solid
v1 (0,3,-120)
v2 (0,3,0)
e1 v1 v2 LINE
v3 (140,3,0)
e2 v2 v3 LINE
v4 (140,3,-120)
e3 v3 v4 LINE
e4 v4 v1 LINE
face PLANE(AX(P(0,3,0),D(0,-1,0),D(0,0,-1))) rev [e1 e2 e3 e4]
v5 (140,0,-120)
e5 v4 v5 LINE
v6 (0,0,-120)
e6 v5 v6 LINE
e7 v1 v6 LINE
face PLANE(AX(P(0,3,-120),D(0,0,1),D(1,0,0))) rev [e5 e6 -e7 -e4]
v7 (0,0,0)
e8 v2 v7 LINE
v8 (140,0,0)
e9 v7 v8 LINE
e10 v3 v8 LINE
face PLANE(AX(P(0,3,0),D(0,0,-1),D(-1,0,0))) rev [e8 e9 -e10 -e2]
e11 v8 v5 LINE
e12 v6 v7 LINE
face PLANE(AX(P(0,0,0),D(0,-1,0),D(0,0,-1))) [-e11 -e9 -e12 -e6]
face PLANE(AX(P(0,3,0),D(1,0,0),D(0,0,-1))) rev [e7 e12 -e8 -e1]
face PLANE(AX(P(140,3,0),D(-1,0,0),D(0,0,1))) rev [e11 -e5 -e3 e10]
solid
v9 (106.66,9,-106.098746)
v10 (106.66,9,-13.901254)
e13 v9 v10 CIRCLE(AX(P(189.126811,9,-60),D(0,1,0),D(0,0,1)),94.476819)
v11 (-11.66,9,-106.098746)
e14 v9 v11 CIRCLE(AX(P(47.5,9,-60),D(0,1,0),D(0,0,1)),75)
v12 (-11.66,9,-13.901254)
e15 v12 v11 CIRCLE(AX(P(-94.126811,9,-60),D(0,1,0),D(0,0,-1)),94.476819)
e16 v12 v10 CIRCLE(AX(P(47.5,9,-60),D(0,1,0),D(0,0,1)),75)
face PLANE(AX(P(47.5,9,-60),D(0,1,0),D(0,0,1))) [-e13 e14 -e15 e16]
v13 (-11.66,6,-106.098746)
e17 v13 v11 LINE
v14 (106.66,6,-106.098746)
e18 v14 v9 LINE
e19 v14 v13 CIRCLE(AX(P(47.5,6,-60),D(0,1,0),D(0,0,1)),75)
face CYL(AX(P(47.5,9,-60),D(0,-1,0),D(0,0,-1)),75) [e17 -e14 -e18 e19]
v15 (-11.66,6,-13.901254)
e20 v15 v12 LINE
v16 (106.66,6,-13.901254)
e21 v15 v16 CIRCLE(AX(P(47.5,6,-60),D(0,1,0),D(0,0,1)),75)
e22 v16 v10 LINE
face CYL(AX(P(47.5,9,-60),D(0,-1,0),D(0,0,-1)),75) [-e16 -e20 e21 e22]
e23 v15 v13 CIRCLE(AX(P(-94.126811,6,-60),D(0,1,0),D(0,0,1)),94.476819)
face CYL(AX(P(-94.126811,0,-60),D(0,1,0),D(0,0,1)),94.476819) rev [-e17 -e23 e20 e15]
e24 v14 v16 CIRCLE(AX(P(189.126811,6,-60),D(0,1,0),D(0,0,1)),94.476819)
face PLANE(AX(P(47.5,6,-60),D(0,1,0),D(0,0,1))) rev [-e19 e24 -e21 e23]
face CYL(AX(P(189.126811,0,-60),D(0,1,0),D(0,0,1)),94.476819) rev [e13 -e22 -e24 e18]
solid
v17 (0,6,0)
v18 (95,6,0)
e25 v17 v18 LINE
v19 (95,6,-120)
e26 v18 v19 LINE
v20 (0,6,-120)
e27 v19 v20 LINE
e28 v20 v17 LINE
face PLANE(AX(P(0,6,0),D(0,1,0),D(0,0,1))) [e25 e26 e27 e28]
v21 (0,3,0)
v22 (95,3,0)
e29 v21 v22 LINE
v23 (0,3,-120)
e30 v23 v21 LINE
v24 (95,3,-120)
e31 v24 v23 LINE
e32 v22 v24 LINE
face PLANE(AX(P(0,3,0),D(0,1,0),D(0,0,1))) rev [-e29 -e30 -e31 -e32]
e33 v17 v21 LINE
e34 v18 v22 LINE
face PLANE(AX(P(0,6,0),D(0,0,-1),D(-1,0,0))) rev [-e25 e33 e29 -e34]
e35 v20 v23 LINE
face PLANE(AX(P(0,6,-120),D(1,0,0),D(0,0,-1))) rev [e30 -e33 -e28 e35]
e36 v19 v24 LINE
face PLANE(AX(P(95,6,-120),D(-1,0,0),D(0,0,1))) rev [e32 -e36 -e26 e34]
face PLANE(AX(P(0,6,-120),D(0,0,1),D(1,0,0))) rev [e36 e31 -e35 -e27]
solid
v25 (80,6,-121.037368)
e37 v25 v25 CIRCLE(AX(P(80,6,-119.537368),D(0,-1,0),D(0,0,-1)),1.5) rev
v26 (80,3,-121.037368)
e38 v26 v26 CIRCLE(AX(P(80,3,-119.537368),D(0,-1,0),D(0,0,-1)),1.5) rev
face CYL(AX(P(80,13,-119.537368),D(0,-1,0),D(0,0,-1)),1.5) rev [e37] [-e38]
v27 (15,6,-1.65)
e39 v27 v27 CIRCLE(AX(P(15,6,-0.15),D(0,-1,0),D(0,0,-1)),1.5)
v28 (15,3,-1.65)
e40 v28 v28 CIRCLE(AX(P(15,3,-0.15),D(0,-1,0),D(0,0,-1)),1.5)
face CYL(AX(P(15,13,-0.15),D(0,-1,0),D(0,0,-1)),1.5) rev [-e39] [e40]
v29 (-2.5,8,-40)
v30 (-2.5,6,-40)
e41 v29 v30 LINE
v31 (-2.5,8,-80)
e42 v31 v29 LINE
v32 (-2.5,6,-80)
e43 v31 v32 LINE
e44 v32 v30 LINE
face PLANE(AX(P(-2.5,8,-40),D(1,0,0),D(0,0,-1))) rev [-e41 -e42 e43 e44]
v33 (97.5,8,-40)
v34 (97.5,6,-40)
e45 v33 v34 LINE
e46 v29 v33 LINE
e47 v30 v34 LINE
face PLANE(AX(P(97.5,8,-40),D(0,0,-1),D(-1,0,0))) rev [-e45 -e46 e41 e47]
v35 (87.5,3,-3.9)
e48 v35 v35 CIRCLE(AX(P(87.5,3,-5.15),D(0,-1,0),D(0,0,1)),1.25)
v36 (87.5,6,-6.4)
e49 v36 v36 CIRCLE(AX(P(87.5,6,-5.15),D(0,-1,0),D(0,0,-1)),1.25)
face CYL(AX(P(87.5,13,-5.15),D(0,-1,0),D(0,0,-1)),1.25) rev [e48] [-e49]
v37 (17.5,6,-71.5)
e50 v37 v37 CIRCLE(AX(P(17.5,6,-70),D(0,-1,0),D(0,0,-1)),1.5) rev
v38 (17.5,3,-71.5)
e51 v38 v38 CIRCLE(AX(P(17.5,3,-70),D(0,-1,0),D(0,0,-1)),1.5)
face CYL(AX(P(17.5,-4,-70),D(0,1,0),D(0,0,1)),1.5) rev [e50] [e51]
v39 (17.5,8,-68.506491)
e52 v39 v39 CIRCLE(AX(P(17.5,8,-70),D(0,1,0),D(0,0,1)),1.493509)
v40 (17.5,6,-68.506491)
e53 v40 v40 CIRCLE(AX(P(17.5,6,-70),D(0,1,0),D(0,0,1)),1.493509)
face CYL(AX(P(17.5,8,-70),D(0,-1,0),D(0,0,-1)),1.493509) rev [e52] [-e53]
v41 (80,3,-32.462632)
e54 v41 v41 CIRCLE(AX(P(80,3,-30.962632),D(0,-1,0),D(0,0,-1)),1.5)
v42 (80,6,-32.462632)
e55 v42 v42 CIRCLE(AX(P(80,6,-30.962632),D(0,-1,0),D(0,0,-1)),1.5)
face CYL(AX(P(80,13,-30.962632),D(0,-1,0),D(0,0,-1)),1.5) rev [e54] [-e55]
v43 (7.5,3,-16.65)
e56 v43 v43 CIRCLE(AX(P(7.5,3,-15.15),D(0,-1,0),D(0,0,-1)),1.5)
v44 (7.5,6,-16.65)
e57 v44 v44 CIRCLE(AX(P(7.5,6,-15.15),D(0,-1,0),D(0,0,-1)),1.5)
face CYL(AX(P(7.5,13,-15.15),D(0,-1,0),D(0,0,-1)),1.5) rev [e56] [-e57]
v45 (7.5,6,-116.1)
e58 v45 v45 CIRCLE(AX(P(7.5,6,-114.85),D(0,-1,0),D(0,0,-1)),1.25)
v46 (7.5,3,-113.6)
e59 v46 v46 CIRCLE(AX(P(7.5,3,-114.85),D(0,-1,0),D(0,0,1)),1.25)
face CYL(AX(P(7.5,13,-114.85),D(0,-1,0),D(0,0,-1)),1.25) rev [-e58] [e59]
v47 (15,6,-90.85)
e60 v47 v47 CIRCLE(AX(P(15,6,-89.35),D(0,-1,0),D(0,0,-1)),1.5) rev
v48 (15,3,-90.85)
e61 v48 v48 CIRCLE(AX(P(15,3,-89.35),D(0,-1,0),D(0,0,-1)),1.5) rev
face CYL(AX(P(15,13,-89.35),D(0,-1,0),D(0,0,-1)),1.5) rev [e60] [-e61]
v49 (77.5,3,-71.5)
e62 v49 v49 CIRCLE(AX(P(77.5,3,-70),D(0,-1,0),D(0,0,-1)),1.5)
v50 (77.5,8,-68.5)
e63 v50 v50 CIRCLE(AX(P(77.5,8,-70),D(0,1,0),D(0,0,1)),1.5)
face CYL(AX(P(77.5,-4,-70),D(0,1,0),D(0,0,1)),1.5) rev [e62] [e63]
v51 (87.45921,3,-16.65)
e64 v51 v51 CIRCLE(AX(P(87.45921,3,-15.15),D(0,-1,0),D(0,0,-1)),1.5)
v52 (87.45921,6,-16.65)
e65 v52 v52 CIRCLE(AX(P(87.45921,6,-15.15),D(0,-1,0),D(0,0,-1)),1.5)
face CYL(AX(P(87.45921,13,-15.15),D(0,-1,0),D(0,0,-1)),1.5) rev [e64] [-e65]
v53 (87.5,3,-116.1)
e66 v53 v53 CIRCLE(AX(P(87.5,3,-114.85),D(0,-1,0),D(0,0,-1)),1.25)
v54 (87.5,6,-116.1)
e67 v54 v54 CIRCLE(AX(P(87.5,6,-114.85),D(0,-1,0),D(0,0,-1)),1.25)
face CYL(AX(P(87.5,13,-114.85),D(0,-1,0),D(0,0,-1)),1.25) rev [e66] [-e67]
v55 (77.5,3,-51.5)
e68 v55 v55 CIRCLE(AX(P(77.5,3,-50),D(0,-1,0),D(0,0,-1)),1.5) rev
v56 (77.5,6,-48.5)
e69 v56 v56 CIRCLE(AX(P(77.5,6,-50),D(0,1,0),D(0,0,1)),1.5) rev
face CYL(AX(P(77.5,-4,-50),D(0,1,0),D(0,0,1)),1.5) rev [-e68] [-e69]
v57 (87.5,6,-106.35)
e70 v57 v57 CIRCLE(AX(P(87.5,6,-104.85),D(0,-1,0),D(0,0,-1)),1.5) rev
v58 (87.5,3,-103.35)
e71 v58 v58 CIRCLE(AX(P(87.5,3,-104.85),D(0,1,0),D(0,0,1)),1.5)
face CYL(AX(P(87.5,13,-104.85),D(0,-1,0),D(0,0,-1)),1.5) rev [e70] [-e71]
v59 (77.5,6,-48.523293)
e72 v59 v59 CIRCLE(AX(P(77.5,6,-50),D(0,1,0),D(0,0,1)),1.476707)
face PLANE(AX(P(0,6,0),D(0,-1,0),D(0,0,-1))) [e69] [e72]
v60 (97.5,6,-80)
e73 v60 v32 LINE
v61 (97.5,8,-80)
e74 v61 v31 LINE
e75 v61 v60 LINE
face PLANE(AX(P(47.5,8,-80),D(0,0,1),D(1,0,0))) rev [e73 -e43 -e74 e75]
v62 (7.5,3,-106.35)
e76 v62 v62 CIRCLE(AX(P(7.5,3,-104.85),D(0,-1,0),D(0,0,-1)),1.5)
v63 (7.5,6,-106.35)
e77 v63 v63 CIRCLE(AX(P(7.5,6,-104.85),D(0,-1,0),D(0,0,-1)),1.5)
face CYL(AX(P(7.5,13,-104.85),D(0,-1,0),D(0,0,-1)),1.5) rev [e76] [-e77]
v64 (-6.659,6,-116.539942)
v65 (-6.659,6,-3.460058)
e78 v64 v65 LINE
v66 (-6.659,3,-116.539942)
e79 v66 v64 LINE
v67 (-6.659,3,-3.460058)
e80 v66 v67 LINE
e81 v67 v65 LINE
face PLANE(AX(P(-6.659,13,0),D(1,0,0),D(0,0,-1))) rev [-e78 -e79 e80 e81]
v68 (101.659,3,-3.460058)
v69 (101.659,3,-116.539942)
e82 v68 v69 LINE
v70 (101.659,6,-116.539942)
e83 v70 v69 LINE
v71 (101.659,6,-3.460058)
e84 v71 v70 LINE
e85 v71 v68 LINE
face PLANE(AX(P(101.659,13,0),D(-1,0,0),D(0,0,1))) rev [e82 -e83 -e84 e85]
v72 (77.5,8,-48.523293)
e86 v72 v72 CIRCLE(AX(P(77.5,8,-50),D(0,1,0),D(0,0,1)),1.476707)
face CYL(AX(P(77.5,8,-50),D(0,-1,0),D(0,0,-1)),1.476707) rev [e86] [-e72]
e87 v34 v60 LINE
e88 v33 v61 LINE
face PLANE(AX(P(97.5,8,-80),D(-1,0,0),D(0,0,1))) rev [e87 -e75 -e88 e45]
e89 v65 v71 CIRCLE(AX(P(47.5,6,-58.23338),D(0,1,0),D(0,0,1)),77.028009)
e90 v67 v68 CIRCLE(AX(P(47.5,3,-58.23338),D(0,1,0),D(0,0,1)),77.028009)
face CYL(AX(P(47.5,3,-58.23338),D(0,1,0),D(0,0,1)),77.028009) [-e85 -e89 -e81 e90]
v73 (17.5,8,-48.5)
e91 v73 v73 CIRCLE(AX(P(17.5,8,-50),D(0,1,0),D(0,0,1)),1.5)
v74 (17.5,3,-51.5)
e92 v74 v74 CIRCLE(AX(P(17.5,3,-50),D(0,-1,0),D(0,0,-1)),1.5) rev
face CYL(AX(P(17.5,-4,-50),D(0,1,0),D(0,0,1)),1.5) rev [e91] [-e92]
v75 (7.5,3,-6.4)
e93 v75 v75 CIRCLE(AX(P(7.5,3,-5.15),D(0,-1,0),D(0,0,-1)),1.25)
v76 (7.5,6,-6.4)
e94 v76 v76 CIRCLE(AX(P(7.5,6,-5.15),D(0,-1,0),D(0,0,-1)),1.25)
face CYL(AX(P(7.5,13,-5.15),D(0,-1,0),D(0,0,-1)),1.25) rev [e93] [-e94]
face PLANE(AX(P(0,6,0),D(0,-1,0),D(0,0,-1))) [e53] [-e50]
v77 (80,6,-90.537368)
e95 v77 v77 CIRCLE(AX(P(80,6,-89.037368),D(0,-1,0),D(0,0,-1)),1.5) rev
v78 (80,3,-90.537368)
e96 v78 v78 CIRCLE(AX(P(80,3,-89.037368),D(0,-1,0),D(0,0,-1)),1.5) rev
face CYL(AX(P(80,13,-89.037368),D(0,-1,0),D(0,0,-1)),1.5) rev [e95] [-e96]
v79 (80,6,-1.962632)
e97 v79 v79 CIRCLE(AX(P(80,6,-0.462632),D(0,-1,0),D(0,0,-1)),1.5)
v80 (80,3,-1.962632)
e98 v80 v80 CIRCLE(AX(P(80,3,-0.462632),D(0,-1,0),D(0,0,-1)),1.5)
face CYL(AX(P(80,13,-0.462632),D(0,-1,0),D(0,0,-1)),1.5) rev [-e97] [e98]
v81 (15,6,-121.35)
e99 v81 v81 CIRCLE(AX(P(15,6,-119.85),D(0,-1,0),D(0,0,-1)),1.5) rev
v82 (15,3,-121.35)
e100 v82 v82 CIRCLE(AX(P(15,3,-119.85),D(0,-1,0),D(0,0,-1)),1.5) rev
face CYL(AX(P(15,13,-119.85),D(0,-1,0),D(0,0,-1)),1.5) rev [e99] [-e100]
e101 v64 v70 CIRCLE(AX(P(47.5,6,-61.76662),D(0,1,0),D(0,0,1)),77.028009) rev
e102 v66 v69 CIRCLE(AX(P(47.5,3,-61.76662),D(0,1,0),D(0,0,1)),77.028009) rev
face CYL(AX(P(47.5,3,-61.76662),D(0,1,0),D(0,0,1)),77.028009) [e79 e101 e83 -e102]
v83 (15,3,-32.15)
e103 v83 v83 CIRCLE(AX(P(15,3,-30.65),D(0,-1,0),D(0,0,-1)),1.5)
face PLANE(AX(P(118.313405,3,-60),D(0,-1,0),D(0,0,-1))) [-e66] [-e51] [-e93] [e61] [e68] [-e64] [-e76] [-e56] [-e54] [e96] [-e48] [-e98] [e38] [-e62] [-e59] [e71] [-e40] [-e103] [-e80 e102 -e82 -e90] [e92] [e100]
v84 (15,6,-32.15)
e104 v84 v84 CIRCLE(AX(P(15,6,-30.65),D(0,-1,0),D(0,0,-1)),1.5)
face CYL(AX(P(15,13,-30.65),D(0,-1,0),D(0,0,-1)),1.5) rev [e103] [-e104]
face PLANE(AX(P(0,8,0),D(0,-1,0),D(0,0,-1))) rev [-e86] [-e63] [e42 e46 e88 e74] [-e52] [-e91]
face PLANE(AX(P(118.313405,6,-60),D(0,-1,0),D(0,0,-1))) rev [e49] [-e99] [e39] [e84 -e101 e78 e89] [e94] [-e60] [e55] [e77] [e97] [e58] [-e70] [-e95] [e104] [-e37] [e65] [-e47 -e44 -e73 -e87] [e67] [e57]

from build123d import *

# Parameters (mm, degrees)
SKETCH1_W                   = 140
SKETCH1_H                   = 120
COMPACT_DEPTH               = 3
SKETCH4_W                   = 95
SKETCH4_H                   = 120
SUPERCOMPACT_DEPTH          = 3
SKETCH7_R                   = 75
APPLE_BASE_DEPTH            = 3
SIDECUTS_DEPTH              = 195.694632694
APPLE_BASE_2_DEPTH          = 3
BOSS_EXTRUDE4_DEPTH         = 3
BASE_PLATE_FILLET_R         = 0.001
TOP_BOTTOM_EXTENSIONS_DEPTH = 3
SKETCH35_R                  = 1.25
SPACERHOLES_DEPTH           = 10
CUT_EXTRUDE4_DEPTH          = 10
SKETCH39_R                  = 1.5
CUT_EXTRUDE5_DEPTH          = 10
CUT_EXTRUDE6_START          = -3
CUT_EXTRUDE6_OUTLINE_R      = 1.5
CUT_EXTRUDE6_DEPTH          = 3
SKETCH41_R                  = 1.5
CUT_EXTRUDE7_DEPTH          = 10
SKETCH45_R                  = 1.5
CUT_EXTRUDE8_DEPTH          = 10
SKETCH46_R                  = 1.493508908
SKETCH46_R_2                = 1.5
SKETCH46_R_3                = 1.476707346
BOSS_EXTRUDE5_DEPTH         = 2


# Read off the part's stored shape, not the designer's step: Cut-Extrude6
with BuildPart() as part:
    # Sketch1 → Compact (new body)
    with BuildSketch(Plane(origin=(0, 0, 0), x_dir=(1, 0, 0), z_dir=(0, 1, 0))):
        with Locations((70, 60)):
            Rectangle(SKETCH1_W, SKETCH1_H)
    extrude(amount=COMPACT_DEPTH)


with BuildPart() as body_2:
    # Sketch4 → SuperCompact (new body)
    with BuildSketch(Plane(origin=(0, 3, 0), x_dir=(1, 0, 0), z_dir=(0, 1, 0))):
        with Locations((47.5, 60)):
            Rectangle(SKETCH4_W, SKETCH4_H)
    extrude(amount=SUPERCOMPACT_DEPTH)


with BuildPart() as body_3:
    # Sketch7 → Apple Base (new body)
    with BuildSketch(Plane(origin=(0, 6, 0), x_dir=(1, 0, 0), z_dir=(0, 1, 0))):
        with Locations(Location((47.5, 60, 0), (0, 0, 270))):
            Circle(SKETCH7_R)
    extrude(amount=APPLE_BASE_DEPTH)

    # Sketch8 → SideCuts (cut, through all)
    with BuildSketch(Plane(origin=(0, 9, 0), x_dir=(1, 0, 0), z_dir=(0, 1, 0))):
        with BuildLine():
            ThreePointArc((-11.66, 106.098746187), (0.350007958, 60), (-11.66, 13.901253813))
            ThreePointArc((-11.66, 13.901253813), (-27.5, 60), (-11.66, 106.098746187))
        make_face()
        with BuildLine():
            ThreePointArc((106.66, 106.098746187), (94.649992042, 60), (106.66, 13.901253813))
            ThreePointArc((106.66, 13.901253813), (122.5, 60), (106.66, 106.098746187))
        make_face()
    extrude(amount=-SIDECUTS_DEPTH, mode=Mode.SUBTRACT)


with BuildPart() as body_4:
    # Sketch9 → Apple_Base 2 (new body)
    with BuildSketch(Plane.XZ.offset(-6)):
        with BuildLine():
            ThreePointArc((106.66, -13.901253813), (47.5, 15), (-11.66, -13.901253813))
            ThreePointArc((-11.66, -13.901253813), (0.350007958, -60), (-11.66, -106.098746187))
            ThreePointArc((-11.66, -106.098746187), (47.5, -135), (106.66, -106.098746187))
            ThreePointArc((106.66, -106.098746187), (94.649992042, -60), (106.66, -13.901253813))
        make_face()
    extrude(amount=APPLE_BASE_2_DEPTH)

    # Sketch10 → Boss-Extrude4 (add)
    with BuildSketch(Plane(origin=(0, 6, 0), x_dir=(1, 0, 0), z_dir=(0, 1, 0))):
        with BuildLine():
            Line((-11.66, 106.098746187), (-11.66, 13.901253813))
            ThreePointArc((-11.66, 13.901253813), (0.350007958, 60), (-11.66, 106.098746187))
        make_face()
        with BuildLine():
            Line((106.66, 106.098746187), (106.66, 13.901253813))
            ThreePointArc((106.66, 13.901253813), (94.649992042, 60), (106.66, 106.098746187))
        make_face()
    extrude(amount=-BOSS_EXTRUDE4_DEPTH)

    # Base_Plate_Fillet
    base_plate_fillet_edges = [body_4.edges().sort_by_distance(p)[0] for p in [
        (-11.66, 3, -60),
        (-11.66, 6, -60),
        (47.5, 3, -135),
        (106.66, 3, -60),
        (106.66, 6, -60),
        (47.5, 6, -135),
        (47.5, 6, 15),
        (106.66, 4.5, -106.098746187),
        (-11.66, 4.5, -106.098746187),
        (-11.66, 4.5, -13.901253813),
        (106.66, 4.5, -13.901253813),
        (47.5, 3, 15),
    ]]
    fillet(base_plate_fillet_edges, radius=BASE_PLATE_FILLET_R)

    # Sketch25 → Top Bottom extensions (add)
    with BuildSketch(Plane(origin=(0, 6, 0), x_dir=(1, 0, 0), z_dir=(0, 1, 0))):
        with BuildLine():
            Line((-11.659005821, 106.097402592), (-11.659005821, 111.097402592))
            ThreePointArc((-11.659005821, 111.097402592), (47.5, 138.794628322), (106.659005821, 111.097402592))
            Line((106.659005821, 111.097402592), (106.659005821, 106.097402592))
            ThreePointArc((106.659005821, 106.097402592), (47.5, 133.794628322), (-11.659005821, 106.097402592))
        make_face()
        with BuildLine():
            Line((106.659005821, 13.902597408), (106.659005821, 8.902597408))
            ThreePointArc((106.659005821, 8.902597408), (47.5, -18.794628322), (-11.659005821, 8.902597408))
            Line((-11.659005821, 8.902597408), (-11.659005821, 13.902597408))
            ThreePointArc((-11.659005821, 13.902597408), (47.5, -13.794628322), (106.659005821, 13.902597408))
        make_face()
    extrude(amount=-TOP_BOTTOM_EXTENSIONS_DEPTH)

    # Sketch35 → SpacerHoles (cut)
    with BuildSketch(Plane.XZ.offset(-3)):
        with Locations(Location((7.5, -5.15, 0), (0, 0, 270))):
            Circle(SKETCH35_R)
        with Locations(Location((87.5, -5.15, 0), (0, 0, 270))):
            Circle(SKETCH35_R)
        with Locations(Location((87.5, -114.85, 0), (0, 0, 270))):
            Circle(SKETCH35_R)
        with Locations(Location((7.5, -114.85, 0), (0, 0, 270))):
            Circle(SKETCH35_R)
    extrude(amount=-SPACERHOLES_DEPTH, mode=Mode.SUBTRACT)

    # Sketch38 → Cut-Extrude4 (cut)
    with BuildSketch(Plane.XZ.offset(-3)):
        Polygon((47.5, 37.050137759), (120.372278362, 37.050137759), (120.372278362, -158.601845129), (-29.177494987, -158.601845129), (-29.177494987, 37.050137759), align=None)
        Polygon((-6.659, -60), (-6.659, 24.702355976), (101.659, 24.702355976), (101.659, -143.843523469), (-6.659, -143.843523469), align=None, mode=Mode.SUBTRACT)
    extrude(amount=-CUT_EXTRUDE4_DEPTH, mode=Mode.SUBTRACT)

    # Sketch39 → Cut-Extrude5 (cut)
    with BuildSketch(Plane.XZ.offset(-3)):
        with Locations(Location((7.5, -104.85, 0), (0, 0, 270))):
            Circle(SKETCH39_R)
        with Locations(Location((87.5, -104.85, 0), (0, 0, 270))):
            Circle(SKETCH39_R)
    extrude(amount=-CUT_EXTRUDE5_DEPTH, mode=Mode.SUBTRACT)

    # Cut-Extrude6 outline → Cut-Extrude6 (cut)
    with BuildSketch(Plane.XZ.offset(-3).offset(CUT_EXTRUDE6_START)):
        with Locations((15, -0.15)):
            Circle(CUT_EXTRUDE6_OUTLINE_R)
        with Locations((15, -119.85)):
            Circle(CUT_EXTRUDE6_OUTLINE_R)
        with Locations((80, -119.537367713)):
            Circle(CUT_EXTRUDE6_OUTLINE_R)
        with Locations((80, -89.037367713)):
            Circle(CUT_EXTRUDE6_OUTLINE_R)
        with Locations((80, -0.462632287)):
            Circle(CUT_EXTRUDE6_OUTLINE_R)
        with Locations((15, -30.65)):
            Circle(CUT_EXTRUDE6_OUTLINE_R)
        with Locations((80, -30.962632287)):
            Circle(CUT_EXTRUDE6_OUTLINE_R)
        with Locations((15, -89.35)):
            Circle(CUT_EXTRUDE6_OUTLINE_R)
    extrude(amount=CUT_EXTRUDE6_DEPTH, mode=Mode.SUBTRACT)

    # Sketch41 → Cut-Extrude7 (cut)
    with BuildSketch(Plane.XZ.offset(-3)):
        with Locations(Location((7.5, -15.15, 0), (0, 0, 270))):
            Circle(SKETCH41_R)
        with Locations(Location((87.459210086, -15.15, 0), (0, 0, 270))):
            Circle(SKETCH41_R)
    extrude(amount=-CUT_EXTRUDE7_DEPTH, mode=Mode.SUBTRACT)

    # Sketch45 → Cut-Extrude8 (cut)
    with BuildSketch(Plane(origin=(0, 6, 0), x_dir=(1, 0, 0), z_dir=(0, 1, 0))):
        with Locations(Location((77.5, 70, 0), (0, 0, 270))):
            Circle(SKETCH45_R)
        with Locations(Location((17.5, 70, 0), (0, 0, 270))):
            Circle(SKETCH45_R)
        with Locations(Location((17.5, 50, 0), (0, 0, 270))):
            Circle(SKETCH45_R)
        with Locations(Location((77.5, 50, 0), (0, 0, 270))):
            Circle(SKETCH45_R)
    extrude(amount=-CUT_EXTRUDE8_DEPTH, mode=Mode.SUBTRACT)

    # Sketch46 → Boss-Extrude5 (add)
    with BuildSketch(Plane(origin=(0, 6, 0), x_dir=(1, 0, 0), z_dir=(0, 1, 0))):
        Polygon((47.5, 80), (97.5, 80), (97.5, 40), (-2.5, 40), (-2.5, 80), align=None)
        with Locations(Location((17.5, 70, 0), (0, 0, 270))):
            Circle(SKETCH46_R, mode=Mode.SUBTRACT)
        with Locations(Location((77.5, 70, 0), (0, 0, 270))):
            Circle(SKETCH46_R_2, mode=Mode.SUBTRACT)
        with Locations(Location((77.5, 50, 0), (0, 0, 270))):
            Circle(SKETCH46_R_3, mode=Mode.SUBTRACT)
        with Locations(Location((17.5, 50, 0), (0, 0, 270))):
            Circle(SKETCH46_R_2, mode=Mode.SUBTRACT)
    extrude(amount=BOSS_EXTRUDE5_DEPTH)


solid = Compound([part.part, body_2.part, body_3.part, body_4.part])
